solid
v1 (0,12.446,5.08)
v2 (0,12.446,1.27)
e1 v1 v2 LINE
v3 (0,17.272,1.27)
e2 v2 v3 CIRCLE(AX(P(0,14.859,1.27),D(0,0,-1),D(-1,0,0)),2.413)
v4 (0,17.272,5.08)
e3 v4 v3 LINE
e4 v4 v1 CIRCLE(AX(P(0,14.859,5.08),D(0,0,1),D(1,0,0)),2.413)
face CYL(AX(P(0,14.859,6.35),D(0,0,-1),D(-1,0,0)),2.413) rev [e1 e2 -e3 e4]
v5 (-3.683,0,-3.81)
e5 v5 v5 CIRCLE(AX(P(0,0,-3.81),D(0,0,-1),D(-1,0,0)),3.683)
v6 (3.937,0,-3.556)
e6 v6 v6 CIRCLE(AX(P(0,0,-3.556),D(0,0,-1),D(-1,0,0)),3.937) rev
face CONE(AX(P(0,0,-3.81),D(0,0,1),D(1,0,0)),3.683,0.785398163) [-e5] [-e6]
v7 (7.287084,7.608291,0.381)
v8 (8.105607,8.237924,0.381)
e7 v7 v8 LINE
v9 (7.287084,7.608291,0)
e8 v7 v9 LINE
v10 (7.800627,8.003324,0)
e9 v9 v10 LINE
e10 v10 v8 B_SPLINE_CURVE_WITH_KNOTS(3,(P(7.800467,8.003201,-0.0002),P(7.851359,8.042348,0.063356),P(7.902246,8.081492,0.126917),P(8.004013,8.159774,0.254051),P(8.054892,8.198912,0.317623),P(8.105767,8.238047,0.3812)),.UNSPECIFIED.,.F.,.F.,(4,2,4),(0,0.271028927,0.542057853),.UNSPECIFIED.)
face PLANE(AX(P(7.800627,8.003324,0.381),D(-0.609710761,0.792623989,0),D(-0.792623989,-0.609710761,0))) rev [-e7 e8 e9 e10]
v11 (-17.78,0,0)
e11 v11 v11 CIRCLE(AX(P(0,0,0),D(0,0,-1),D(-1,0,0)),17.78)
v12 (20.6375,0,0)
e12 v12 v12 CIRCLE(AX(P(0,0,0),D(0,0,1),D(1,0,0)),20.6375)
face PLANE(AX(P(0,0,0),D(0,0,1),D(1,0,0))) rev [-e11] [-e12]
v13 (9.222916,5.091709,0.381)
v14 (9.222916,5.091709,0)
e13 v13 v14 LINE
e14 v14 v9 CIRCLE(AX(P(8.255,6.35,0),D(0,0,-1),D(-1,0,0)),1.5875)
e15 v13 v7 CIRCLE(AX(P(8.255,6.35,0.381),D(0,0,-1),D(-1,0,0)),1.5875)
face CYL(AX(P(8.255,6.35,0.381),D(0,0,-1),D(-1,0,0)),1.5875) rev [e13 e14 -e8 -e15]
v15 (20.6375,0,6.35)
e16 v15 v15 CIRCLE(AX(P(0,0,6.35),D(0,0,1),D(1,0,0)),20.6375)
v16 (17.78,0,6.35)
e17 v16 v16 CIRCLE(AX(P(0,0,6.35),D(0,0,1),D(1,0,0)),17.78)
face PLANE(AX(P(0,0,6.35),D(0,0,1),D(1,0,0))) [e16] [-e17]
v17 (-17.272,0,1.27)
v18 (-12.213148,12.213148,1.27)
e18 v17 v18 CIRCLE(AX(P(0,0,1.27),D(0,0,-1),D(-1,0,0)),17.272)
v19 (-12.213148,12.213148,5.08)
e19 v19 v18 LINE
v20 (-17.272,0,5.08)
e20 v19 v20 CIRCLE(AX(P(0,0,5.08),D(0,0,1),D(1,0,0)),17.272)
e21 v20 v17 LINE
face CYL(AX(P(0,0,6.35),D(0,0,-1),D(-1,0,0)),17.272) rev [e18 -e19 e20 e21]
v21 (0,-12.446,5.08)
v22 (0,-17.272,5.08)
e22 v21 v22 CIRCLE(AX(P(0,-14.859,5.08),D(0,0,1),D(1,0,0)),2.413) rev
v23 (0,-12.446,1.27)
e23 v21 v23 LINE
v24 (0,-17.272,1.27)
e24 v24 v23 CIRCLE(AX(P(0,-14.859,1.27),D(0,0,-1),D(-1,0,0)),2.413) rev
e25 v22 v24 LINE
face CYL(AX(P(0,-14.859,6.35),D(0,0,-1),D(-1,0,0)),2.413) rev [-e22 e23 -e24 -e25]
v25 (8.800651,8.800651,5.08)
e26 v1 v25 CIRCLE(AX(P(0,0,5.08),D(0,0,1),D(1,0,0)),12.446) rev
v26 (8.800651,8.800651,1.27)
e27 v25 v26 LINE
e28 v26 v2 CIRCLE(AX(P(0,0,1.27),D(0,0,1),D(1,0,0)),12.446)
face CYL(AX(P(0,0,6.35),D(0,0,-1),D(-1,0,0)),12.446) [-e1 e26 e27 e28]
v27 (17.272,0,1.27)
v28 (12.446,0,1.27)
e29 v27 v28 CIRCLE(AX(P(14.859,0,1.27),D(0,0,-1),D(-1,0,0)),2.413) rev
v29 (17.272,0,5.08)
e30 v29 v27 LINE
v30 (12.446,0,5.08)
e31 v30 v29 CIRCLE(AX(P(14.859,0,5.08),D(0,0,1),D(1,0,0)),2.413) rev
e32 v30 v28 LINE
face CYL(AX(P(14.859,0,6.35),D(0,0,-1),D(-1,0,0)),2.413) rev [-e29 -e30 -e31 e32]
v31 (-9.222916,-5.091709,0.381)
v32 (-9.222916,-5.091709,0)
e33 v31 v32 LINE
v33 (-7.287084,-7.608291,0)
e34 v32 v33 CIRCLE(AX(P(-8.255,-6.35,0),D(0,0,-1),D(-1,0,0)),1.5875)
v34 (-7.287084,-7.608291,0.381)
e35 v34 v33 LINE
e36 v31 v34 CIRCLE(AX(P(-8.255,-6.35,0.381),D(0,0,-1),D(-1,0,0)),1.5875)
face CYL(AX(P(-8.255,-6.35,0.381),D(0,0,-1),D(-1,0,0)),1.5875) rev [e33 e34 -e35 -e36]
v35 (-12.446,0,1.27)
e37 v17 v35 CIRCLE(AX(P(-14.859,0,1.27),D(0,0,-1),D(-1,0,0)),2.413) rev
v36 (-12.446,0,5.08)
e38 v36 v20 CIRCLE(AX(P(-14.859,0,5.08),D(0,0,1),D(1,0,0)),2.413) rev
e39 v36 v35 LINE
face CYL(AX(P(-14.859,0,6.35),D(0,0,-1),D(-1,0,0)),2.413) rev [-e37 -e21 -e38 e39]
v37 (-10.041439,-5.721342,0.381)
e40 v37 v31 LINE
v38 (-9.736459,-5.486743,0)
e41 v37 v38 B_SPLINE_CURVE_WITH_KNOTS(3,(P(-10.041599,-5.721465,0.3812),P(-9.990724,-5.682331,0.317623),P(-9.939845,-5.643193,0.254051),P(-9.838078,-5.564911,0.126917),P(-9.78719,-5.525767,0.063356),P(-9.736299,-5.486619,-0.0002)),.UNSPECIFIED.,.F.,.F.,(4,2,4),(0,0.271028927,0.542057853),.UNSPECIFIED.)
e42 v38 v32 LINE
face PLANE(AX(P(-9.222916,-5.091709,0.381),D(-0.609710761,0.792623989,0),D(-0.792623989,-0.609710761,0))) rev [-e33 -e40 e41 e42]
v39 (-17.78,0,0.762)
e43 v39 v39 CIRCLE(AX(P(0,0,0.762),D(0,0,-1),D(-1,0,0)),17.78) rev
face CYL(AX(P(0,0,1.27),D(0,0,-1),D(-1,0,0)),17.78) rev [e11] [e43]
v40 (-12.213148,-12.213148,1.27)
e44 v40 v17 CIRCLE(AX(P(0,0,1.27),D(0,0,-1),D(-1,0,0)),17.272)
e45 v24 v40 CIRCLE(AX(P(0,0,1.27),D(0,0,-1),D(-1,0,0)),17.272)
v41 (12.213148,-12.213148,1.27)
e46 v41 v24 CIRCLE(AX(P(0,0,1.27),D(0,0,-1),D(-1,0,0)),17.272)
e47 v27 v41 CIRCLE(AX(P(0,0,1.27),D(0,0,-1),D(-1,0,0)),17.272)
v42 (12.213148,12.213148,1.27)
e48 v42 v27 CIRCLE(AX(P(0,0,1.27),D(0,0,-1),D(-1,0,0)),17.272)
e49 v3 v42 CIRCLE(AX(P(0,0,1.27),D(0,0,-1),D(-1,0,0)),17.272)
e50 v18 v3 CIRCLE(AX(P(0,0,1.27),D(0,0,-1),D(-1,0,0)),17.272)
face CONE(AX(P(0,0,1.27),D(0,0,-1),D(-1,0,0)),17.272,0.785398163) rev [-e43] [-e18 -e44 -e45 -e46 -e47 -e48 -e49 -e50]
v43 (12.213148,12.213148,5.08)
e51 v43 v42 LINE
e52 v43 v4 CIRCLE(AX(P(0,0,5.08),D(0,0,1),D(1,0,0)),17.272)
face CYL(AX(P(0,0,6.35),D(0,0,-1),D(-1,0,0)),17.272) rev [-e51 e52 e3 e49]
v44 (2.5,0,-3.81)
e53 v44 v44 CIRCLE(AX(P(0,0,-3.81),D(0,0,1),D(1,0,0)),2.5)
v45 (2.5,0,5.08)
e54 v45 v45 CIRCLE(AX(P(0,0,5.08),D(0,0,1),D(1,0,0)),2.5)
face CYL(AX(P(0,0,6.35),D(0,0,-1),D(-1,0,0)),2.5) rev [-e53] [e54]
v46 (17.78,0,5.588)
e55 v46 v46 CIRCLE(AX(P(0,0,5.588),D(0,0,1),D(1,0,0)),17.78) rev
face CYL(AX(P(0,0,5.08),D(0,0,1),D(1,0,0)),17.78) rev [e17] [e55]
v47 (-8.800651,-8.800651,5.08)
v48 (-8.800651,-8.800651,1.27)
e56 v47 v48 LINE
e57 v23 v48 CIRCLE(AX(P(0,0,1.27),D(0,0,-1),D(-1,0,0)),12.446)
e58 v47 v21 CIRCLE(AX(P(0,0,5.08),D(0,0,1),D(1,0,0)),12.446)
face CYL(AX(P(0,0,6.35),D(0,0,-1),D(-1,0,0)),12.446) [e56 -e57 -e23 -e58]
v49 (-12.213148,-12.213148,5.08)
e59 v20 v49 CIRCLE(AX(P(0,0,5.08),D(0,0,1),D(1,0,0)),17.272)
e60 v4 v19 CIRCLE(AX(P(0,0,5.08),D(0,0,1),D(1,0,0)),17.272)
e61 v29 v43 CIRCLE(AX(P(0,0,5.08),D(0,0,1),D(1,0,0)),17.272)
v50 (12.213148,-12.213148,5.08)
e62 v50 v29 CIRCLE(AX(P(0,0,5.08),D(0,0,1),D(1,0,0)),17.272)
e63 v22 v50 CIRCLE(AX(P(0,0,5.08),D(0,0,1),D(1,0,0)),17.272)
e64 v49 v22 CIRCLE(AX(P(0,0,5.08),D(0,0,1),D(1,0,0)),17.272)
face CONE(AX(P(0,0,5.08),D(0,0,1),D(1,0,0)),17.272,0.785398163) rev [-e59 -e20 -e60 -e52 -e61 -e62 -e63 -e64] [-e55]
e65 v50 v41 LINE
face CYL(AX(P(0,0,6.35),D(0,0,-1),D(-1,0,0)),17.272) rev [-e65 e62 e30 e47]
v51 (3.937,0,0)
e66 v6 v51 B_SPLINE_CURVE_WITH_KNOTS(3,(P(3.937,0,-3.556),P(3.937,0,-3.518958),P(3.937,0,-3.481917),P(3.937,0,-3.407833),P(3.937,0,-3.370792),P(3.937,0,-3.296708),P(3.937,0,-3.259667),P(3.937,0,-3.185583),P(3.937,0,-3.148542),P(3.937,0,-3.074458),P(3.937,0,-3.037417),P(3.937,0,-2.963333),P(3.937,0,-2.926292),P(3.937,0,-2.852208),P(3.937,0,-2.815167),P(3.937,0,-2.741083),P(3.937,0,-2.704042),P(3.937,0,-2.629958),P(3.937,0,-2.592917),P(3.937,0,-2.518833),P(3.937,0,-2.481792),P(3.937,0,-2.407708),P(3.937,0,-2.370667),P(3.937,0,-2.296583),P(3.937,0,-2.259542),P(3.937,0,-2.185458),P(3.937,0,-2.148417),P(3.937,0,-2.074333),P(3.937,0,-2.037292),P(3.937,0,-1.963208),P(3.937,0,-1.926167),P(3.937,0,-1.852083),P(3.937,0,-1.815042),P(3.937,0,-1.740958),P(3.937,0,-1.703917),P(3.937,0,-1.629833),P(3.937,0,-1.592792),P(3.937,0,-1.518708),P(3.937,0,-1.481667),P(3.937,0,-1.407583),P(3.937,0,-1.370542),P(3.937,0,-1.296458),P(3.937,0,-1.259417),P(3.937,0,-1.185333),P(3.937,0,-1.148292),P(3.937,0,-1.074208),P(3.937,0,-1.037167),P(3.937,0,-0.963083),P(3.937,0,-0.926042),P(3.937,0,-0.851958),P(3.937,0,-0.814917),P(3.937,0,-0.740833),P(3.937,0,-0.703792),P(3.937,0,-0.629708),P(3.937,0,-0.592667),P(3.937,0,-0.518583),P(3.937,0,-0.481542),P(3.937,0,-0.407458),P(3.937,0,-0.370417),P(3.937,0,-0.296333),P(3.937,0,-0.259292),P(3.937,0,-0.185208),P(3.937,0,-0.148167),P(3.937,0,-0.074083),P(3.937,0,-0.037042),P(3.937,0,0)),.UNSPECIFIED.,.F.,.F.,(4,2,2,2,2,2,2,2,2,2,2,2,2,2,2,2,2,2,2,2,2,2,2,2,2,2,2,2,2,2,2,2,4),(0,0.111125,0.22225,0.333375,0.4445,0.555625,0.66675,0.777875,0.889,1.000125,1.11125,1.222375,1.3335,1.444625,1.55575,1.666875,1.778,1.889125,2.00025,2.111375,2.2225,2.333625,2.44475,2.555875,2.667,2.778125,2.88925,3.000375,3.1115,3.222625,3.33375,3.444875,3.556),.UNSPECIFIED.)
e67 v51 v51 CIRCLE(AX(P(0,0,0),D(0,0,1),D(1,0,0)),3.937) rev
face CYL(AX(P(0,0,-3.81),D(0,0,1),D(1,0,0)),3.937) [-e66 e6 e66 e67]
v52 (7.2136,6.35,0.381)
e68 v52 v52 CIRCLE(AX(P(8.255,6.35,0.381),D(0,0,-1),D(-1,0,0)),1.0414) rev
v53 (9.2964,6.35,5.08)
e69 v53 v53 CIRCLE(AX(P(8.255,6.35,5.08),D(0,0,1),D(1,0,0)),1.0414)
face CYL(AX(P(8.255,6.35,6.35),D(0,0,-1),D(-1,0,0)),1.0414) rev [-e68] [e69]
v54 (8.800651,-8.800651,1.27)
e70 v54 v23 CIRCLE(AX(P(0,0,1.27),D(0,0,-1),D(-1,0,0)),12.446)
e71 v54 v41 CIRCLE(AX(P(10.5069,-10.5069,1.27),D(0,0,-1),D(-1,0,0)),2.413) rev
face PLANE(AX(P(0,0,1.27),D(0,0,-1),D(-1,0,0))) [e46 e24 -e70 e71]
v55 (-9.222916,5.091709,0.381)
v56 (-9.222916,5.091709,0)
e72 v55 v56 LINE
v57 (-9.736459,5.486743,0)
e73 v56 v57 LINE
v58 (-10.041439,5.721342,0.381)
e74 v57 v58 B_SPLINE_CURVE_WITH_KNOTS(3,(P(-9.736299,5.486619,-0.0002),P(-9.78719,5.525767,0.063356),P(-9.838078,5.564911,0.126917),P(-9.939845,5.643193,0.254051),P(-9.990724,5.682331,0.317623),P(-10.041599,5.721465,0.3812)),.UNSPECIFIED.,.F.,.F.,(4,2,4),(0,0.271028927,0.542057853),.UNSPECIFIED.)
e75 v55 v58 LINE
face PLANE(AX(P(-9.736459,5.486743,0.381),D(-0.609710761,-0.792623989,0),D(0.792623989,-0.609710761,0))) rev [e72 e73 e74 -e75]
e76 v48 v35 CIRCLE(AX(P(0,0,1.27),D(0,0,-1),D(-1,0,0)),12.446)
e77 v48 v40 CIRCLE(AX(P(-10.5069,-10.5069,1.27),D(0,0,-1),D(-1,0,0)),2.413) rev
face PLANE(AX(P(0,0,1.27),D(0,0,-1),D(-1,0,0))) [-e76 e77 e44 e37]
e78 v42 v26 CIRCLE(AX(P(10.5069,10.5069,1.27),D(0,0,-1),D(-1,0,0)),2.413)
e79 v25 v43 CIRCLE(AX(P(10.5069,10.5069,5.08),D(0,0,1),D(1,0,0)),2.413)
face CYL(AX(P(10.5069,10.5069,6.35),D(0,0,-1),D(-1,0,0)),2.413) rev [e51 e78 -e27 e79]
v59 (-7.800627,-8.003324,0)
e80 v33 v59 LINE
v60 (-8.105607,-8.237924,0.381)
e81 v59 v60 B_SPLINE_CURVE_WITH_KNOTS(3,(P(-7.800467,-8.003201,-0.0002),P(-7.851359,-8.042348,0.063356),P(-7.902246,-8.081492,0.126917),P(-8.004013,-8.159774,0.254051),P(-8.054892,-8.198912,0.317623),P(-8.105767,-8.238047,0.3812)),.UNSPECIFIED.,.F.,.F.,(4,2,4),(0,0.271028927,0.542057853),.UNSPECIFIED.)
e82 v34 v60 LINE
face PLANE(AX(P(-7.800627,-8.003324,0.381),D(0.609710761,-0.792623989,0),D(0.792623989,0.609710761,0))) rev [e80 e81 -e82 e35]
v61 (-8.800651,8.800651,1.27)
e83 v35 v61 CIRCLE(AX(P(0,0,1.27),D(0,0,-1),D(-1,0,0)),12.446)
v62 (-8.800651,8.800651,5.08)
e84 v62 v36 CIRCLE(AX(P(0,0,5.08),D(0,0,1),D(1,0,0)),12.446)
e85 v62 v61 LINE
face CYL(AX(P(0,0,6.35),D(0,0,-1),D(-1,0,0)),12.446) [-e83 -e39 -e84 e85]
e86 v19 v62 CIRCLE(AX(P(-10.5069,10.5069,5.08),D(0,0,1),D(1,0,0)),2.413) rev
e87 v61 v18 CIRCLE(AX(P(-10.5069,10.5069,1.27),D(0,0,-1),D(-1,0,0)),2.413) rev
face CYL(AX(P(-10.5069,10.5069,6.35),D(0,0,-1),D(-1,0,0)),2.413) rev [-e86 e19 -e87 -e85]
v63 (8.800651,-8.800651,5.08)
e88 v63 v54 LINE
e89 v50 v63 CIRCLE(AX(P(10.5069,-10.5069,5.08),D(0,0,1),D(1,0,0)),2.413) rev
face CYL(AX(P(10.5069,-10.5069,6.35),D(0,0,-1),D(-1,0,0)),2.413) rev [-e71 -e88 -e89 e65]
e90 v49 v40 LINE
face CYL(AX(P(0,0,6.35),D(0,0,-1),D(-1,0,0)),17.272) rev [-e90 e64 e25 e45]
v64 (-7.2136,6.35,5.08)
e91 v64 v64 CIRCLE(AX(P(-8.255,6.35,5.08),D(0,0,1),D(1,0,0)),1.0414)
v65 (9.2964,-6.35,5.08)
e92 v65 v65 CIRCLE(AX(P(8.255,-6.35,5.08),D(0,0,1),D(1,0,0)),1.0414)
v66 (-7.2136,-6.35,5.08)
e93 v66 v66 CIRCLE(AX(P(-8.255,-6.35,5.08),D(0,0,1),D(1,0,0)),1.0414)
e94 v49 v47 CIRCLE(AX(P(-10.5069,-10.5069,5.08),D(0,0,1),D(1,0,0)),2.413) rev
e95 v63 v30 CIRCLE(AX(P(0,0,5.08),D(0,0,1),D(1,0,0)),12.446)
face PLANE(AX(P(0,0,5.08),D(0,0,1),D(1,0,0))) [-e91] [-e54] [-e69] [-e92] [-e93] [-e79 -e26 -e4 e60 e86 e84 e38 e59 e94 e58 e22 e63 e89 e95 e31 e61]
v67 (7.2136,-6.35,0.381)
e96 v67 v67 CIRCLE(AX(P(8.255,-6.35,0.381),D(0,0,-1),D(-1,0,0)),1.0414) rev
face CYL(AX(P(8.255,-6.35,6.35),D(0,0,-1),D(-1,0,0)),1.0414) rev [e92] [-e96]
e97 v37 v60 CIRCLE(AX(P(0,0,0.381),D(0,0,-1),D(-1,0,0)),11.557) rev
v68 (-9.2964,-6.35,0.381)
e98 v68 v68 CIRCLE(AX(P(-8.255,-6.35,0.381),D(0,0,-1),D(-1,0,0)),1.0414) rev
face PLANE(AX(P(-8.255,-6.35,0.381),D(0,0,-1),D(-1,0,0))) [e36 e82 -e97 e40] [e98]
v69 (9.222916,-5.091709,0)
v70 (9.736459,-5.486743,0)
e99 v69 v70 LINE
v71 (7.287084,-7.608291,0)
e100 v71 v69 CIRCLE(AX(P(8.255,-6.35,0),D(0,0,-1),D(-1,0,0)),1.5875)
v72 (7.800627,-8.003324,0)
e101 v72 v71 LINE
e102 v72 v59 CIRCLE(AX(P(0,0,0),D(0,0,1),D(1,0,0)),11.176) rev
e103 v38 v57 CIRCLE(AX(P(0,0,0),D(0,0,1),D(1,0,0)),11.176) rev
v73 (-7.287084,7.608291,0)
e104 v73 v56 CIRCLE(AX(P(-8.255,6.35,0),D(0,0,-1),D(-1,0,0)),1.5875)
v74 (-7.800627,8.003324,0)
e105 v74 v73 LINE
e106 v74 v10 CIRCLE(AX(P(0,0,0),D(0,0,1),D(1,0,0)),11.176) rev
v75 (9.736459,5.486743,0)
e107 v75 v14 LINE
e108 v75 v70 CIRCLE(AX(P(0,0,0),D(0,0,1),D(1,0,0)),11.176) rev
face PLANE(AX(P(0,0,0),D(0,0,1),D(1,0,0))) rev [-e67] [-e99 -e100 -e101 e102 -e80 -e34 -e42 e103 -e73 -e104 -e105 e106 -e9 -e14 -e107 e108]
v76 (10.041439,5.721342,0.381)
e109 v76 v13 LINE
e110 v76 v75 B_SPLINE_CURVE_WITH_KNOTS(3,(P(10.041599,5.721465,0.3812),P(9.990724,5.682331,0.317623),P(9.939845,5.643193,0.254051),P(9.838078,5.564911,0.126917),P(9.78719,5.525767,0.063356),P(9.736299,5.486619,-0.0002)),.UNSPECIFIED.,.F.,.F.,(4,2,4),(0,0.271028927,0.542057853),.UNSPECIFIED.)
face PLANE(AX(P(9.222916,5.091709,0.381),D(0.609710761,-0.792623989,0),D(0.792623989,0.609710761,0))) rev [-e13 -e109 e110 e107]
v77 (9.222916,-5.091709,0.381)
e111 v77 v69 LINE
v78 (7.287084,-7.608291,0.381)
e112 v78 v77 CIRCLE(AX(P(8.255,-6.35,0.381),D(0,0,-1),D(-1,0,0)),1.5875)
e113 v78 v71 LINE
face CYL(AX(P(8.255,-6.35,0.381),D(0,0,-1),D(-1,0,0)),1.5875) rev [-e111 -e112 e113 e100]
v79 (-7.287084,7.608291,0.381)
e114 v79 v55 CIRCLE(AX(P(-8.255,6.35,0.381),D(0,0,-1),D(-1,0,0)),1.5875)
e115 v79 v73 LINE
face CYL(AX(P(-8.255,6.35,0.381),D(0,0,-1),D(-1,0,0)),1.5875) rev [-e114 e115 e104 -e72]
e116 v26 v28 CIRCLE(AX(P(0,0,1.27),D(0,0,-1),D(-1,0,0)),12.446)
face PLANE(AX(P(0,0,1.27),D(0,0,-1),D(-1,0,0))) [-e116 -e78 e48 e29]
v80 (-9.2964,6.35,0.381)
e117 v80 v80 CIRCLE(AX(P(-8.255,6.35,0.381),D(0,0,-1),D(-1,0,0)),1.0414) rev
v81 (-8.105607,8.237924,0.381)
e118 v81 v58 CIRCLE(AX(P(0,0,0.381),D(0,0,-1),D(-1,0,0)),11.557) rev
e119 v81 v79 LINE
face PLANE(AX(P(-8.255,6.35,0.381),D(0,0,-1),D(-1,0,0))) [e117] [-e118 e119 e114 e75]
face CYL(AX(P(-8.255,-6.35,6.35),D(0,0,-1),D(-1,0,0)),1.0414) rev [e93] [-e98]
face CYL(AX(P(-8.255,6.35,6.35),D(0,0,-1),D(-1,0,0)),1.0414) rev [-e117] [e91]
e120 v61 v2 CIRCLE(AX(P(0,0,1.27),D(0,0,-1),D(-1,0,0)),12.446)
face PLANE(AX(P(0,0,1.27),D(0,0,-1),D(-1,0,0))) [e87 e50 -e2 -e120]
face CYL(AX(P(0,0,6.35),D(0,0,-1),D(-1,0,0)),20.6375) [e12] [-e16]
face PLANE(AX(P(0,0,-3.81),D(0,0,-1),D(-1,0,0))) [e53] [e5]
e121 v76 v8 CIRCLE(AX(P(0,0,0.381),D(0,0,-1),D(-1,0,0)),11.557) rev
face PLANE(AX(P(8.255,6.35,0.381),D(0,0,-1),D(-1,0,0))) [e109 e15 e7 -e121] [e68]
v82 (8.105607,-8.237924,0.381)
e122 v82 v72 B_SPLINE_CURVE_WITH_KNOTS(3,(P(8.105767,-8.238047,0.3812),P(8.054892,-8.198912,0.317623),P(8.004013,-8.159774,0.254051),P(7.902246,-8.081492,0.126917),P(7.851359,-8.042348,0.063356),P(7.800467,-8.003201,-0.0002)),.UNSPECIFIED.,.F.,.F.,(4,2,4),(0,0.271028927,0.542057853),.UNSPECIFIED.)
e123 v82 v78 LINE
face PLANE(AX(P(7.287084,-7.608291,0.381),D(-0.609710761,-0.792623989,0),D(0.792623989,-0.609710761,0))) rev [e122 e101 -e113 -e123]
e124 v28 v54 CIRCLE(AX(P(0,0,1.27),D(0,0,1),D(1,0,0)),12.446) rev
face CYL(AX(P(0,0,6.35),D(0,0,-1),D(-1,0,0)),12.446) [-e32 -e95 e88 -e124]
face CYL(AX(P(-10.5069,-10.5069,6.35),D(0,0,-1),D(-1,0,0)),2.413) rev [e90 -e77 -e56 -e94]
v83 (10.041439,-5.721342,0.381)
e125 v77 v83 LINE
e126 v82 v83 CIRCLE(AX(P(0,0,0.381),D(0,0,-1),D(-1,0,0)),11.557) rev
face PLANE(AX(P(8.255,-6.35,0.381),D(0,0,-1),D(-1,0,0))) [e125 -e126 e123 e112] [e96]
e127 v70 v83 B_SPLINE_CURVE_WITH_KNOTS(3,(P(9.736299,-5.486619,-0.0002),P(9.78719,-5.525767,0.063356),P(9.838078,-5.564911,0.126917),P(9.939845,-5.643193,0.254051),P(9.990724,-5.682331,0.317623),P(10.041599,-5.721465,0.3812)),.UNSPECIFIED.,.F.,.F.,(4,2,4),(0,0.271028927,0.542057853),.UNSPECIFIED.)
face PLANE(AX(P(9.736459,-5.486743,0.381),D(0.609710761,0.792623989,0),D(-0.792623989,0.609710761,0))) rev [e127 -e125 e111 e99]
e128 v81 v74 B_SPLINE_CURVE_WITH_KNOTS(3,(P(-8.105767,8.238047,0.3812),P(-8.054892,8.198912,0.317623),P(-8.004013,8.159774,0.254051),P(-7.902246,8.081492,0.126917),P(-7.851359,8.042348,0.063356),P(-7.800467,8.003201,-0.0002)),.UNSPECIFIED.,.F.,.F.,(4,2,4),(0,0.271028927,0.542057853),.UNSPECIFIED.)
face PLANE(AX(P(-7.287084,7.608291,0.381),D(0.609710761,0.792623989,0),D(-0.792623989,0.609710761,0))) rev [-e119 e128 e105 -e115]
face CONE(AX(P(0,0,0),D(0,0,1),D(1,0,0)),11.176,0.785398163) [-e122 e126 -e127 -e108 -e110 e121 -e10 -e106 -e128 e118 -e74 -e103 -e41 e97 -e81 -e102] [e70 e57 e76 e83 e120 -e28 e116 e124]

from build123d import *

# Parameters (mm, degrees)
SKETCH1_R               = 20.6375
BASE_DEPTH              = 6.35
SKETCH3_R               = 3.937
BOSS_EXTRUDE2_DEPTH     = 3.81
CUT_EXTRUDE2_DEPTH      = 30.868634259
CUT_EXTRUDE2_DEPTH_BACK = 30.868634259
SKETCH2_R               = 2.5
CUT_EXTRUDE3_DEPTH      = 30.868634259
SKETCH7_R               = 17.78
SKETCH7_R_2             = 12.446
CUT_EXTRUDE4_DEPTH      = 1.27
CHAMFER1_SIZE           = 0.508
CHAMFER2_SIZE           = 1.27
CHAMFER3_SIZE           = 0.254
CUT_EXTRUDE5_START      = -1.27
SKETCH8_R               = 17.78
CUT_EXTRUDE5_DEPTH      = 1.27
CHAMFER4_SIZE           = 0.508
SKETCH9_R               = 1.0414
CUT_EXTRUDE6_DEPTH      = 30.868634259
CUT_EXTRUDE7_DEPTH      = 0.381
CIRPATTERN1_COUNT       = 4


with BuildPart() as part:
    # Sketch1 → Base (new body)
    with BuildSketch(Plane.XY):
        Circle(SKETCH1_R)
    extrude(amount=BASE_DEPTH)

    # Sketch3 → Boss-Extrude2 (add)
    with BuildSketch(Plane(origin=(0, 0, 0), x_dir=(-1, 0, 0), z_dir=(0, 0, -1))):
        with Locations(Location((0, 0, 0), (0, 0, 180))):
            Circle(SKETCH3_R)
    extrude(amount=BOSS_EXTRUDE2_DEPTH)

    # Sketch2 → Cut-Extrude2 (cut, two sides: drawn at the far end of the back side and taken through both)
    with BuildSketch(Plane.XY.offset(-CUT_EXTRUDE2_DEPTH_BACK)):
        Circle(SKETCH2_R)
    extrude(amount=CUT_EXTRUDE2_DEPTH + CUT_EXTRUDE2_DEPTH_BACK, mode=Mode.SUBTRACT)

    # Sketch5 → Cut-Extrude3 (cut, through all)
    with BuildSketch(Plane.XY):
        with BuildLine():
            ThreePointArc((8.800650999, 8.800650999), (4.762877999, 11.498604662), (0, 12.446))
            ThreePointArc((0, 12.446), (-2.413, 14.859), (0, 17.272))
            ThreePointArc((0, 17.272), (6.609708244, 15.957247286), (12.213148325, 12.213148325))
            ThreePointArc((12.213148325, 12.213148325), (12.213148325, 8.800650999), (8.800650999, 8.800650999))
        make_face()
    cut_extrude3 = extrude(amount=CUT_EXTRUDE3_DEPTH, mode=Mode.SUBTRACT)

    # Sketch7 → Cut-Extrude4 (cut)
    with BuildSketch(Plane(origin=(0, 0, 0), x_dir=(-1, 0, 0), z_dir=(0, 0, -1))):
        Circle(SKETCH7_R)
        with Locations(Location((0, 0, 0), (0, 0, 90))):
            Circle(SKETCH7_R_2, mode=Mode.SUBTRACT)
    extrude(amount=-CUT_EXTRUDE4_DEPTH, mode=Mode.SUBTRACT)

    # Chamfer1
    chamfer1_edges = [part.edges().sort_by_distance(p)[0] for p in [
        (17.78, 0, 1.27),
    ]]
    chamfer(chamfer1_edges, length=CHAMFER1_SIZE - 0.0001)  # a hair under: the kernel refuses the full size

    # Chamfer2
    chamfer2_edges = [part.edges().sort_by_distance(p)[0] for p in [
        (-4.762877999, -11.498604662, 0),
    ]]
    chamfer(chamfer2_edges, length=CHAMFER2_SIZE - 0.0001)  # a hair under: the kernel refuses the full size

    # Chamfer3
    chamfer3_edges = [part.edges().sort_by_distance(p)[0] for p in [
        (-3.937, 0, -3.81),
    ]]
    chamfer(chamfer3_edges, length=CHAMFER3_SIZE)

    # Sketch8 → Cut-Extrude5 (cut)
    with BuildSketch(Plane.XY.offset(6.35).offset(CUT_EXTRUDE5_START)):
        with Locations(Location((0, 0, 0), (0, 0, 180))):
            Circle(SKETCH8_R)
    extrude(amount=CUT_EXTRUDE5_DEPTH, mode=Mode.SUBTRACT)

    # Chamfer4
    chamfer4_edges = [part.edges().sort_by_distance(p)[0] for p in [
        (17.78, 0, 5.08),
    ]]
    chamfer(chamfer4_edges, length=CHAMFER4_SIZE - 0.0001)  # a hair under: the kernel refuses the full size

    # Sketch9 → Cut-Extrude6 (cut, through all)
    with BuildSketch(Plane(origin=(0, 0, 0), x_dir=(-1, 0, 0), z_dir=(0, 0, -1))):
        with Locations(Location((-8.255, 6.35, 0), (0, 0, 97.477941582))):
            Circle(SKETCH9_R)
        with Locations(Location((8.255, 6.35, 0), (0, 0, 352.61512564))):
            Circle(SKETCH9_R)
        with Locations(Location((8.255, -6.35, 0), (0, 0, 7.384871496))):
            Circle(SKETCH9_R)
        with Locations(Location((-8.255, -6.35, 0), (0, 0, 262.522055553))):
            Circle(SKETCH9_R)
    extrude(amount=-CUT_EXTRUDE6_DEPTH, mode=Mode.SUBTRACT)

    # Sketch10 → Cut-Extrude7 (cut)
    with BuildSketch(Plane(origin=(0, 0, 0), x_dir=(-1, 0, 0), z_dir=(0, 0, -1))):
        with BuildLine():
            Line((-9.222915833, 5.091709417), (-9.736458912, 5.486742555))
            Line((-9.736458912, 5.486742555), (-10.229548299, 5.866042084))
            Line((-10.229548299, 5.866042084), (-8.293716633, 8.382623249))
            Line((-8.293716633, 8.382623249), (-7.800627246, 8.00332372))
            Line((-7.800627246, 8.00332372), (-7.287084167, 7.608290583))
            ThreePointArc((-7.287084167, 7.608290583), (-6.996709417, 5.382084167), (-9.222915833, 5.091709417))
        make_face()
        with BuildLine():
            Line((7.287084167, 7.608290583), (7.800627246, 8.00332372))
            Line((7.800627246, 8.00332372), (8.293716633, 8.382623249))
            Line((8.293716633, 8.382623249), (10.229548299, 5.866042084))
            Line((10.229548299, 5.866042084), (9.736458912, 5.486742555))
            Line((9.736458912, 5.486742555), (9.222915833, 5.091709417))
            ThreePointArc((9.222915833, 5.091709417), (6.996709417, 5.382084167), (7.287084167, 7.608290583))
        make_face()
        with BuildLine():
            Line((9.222915833, -5.091709417), (9.736458912, -5.486742555))
            Line((9.736458912, -5.486742555), (10.229548299, -5.866042084))
            Line((10.229548299, -5.866042084), (8.293716633, -8.382623249))
            Line((8.293716633, -8.382623249), (7.800627246, -8.00332372))
            Line((7.800627246, -8.00332372), (7.287084167, -7.608290583))
            ThreePointArc((7.287084167, -7.608290583), (6.996709417, -5.382084167), (9.222915833, -5.091709417))
        make_face()
        with BuildLine():
            Line((-7.287084167, -7.608290583), (-7.800627246, -8.00332372))
            Line((-7.800627246, -8.00332372), (-8.293716633, -8.382623249))
            Line((-8.293716633, -8.382623249), (-10.229548299, -5.866042084))
            Line((-10.229548299, -5.866042084), (-9.736458912, -5.486742555))
            Line((-9.736458912, -5.486742555), (-9.222915833, -5.091709417))
            ThreePointArc((-9.222915833, -5.091709417), (-6.996709417, -5.382084167), (-7.287084167, -7.608290583))
        make_face()
    extrude(amount=-CUT_EXTRUDE7_DEPTH, mode=Mode.SUBTRACT)

    # CirPattern1: Cut-Extrude3 ×4 about axis
    cirpattern1_axis = Axis((0, 0, 0), (0, 0, 1))
    for i in range(1, CIRPATTERN1_COUNT):
        add(cut_extrude3.rotate(cirpattern1_axis, i * 360 / CIRPATTERN1_COUNT), mode=Mode.SUBTRACT)


solid = part.part
